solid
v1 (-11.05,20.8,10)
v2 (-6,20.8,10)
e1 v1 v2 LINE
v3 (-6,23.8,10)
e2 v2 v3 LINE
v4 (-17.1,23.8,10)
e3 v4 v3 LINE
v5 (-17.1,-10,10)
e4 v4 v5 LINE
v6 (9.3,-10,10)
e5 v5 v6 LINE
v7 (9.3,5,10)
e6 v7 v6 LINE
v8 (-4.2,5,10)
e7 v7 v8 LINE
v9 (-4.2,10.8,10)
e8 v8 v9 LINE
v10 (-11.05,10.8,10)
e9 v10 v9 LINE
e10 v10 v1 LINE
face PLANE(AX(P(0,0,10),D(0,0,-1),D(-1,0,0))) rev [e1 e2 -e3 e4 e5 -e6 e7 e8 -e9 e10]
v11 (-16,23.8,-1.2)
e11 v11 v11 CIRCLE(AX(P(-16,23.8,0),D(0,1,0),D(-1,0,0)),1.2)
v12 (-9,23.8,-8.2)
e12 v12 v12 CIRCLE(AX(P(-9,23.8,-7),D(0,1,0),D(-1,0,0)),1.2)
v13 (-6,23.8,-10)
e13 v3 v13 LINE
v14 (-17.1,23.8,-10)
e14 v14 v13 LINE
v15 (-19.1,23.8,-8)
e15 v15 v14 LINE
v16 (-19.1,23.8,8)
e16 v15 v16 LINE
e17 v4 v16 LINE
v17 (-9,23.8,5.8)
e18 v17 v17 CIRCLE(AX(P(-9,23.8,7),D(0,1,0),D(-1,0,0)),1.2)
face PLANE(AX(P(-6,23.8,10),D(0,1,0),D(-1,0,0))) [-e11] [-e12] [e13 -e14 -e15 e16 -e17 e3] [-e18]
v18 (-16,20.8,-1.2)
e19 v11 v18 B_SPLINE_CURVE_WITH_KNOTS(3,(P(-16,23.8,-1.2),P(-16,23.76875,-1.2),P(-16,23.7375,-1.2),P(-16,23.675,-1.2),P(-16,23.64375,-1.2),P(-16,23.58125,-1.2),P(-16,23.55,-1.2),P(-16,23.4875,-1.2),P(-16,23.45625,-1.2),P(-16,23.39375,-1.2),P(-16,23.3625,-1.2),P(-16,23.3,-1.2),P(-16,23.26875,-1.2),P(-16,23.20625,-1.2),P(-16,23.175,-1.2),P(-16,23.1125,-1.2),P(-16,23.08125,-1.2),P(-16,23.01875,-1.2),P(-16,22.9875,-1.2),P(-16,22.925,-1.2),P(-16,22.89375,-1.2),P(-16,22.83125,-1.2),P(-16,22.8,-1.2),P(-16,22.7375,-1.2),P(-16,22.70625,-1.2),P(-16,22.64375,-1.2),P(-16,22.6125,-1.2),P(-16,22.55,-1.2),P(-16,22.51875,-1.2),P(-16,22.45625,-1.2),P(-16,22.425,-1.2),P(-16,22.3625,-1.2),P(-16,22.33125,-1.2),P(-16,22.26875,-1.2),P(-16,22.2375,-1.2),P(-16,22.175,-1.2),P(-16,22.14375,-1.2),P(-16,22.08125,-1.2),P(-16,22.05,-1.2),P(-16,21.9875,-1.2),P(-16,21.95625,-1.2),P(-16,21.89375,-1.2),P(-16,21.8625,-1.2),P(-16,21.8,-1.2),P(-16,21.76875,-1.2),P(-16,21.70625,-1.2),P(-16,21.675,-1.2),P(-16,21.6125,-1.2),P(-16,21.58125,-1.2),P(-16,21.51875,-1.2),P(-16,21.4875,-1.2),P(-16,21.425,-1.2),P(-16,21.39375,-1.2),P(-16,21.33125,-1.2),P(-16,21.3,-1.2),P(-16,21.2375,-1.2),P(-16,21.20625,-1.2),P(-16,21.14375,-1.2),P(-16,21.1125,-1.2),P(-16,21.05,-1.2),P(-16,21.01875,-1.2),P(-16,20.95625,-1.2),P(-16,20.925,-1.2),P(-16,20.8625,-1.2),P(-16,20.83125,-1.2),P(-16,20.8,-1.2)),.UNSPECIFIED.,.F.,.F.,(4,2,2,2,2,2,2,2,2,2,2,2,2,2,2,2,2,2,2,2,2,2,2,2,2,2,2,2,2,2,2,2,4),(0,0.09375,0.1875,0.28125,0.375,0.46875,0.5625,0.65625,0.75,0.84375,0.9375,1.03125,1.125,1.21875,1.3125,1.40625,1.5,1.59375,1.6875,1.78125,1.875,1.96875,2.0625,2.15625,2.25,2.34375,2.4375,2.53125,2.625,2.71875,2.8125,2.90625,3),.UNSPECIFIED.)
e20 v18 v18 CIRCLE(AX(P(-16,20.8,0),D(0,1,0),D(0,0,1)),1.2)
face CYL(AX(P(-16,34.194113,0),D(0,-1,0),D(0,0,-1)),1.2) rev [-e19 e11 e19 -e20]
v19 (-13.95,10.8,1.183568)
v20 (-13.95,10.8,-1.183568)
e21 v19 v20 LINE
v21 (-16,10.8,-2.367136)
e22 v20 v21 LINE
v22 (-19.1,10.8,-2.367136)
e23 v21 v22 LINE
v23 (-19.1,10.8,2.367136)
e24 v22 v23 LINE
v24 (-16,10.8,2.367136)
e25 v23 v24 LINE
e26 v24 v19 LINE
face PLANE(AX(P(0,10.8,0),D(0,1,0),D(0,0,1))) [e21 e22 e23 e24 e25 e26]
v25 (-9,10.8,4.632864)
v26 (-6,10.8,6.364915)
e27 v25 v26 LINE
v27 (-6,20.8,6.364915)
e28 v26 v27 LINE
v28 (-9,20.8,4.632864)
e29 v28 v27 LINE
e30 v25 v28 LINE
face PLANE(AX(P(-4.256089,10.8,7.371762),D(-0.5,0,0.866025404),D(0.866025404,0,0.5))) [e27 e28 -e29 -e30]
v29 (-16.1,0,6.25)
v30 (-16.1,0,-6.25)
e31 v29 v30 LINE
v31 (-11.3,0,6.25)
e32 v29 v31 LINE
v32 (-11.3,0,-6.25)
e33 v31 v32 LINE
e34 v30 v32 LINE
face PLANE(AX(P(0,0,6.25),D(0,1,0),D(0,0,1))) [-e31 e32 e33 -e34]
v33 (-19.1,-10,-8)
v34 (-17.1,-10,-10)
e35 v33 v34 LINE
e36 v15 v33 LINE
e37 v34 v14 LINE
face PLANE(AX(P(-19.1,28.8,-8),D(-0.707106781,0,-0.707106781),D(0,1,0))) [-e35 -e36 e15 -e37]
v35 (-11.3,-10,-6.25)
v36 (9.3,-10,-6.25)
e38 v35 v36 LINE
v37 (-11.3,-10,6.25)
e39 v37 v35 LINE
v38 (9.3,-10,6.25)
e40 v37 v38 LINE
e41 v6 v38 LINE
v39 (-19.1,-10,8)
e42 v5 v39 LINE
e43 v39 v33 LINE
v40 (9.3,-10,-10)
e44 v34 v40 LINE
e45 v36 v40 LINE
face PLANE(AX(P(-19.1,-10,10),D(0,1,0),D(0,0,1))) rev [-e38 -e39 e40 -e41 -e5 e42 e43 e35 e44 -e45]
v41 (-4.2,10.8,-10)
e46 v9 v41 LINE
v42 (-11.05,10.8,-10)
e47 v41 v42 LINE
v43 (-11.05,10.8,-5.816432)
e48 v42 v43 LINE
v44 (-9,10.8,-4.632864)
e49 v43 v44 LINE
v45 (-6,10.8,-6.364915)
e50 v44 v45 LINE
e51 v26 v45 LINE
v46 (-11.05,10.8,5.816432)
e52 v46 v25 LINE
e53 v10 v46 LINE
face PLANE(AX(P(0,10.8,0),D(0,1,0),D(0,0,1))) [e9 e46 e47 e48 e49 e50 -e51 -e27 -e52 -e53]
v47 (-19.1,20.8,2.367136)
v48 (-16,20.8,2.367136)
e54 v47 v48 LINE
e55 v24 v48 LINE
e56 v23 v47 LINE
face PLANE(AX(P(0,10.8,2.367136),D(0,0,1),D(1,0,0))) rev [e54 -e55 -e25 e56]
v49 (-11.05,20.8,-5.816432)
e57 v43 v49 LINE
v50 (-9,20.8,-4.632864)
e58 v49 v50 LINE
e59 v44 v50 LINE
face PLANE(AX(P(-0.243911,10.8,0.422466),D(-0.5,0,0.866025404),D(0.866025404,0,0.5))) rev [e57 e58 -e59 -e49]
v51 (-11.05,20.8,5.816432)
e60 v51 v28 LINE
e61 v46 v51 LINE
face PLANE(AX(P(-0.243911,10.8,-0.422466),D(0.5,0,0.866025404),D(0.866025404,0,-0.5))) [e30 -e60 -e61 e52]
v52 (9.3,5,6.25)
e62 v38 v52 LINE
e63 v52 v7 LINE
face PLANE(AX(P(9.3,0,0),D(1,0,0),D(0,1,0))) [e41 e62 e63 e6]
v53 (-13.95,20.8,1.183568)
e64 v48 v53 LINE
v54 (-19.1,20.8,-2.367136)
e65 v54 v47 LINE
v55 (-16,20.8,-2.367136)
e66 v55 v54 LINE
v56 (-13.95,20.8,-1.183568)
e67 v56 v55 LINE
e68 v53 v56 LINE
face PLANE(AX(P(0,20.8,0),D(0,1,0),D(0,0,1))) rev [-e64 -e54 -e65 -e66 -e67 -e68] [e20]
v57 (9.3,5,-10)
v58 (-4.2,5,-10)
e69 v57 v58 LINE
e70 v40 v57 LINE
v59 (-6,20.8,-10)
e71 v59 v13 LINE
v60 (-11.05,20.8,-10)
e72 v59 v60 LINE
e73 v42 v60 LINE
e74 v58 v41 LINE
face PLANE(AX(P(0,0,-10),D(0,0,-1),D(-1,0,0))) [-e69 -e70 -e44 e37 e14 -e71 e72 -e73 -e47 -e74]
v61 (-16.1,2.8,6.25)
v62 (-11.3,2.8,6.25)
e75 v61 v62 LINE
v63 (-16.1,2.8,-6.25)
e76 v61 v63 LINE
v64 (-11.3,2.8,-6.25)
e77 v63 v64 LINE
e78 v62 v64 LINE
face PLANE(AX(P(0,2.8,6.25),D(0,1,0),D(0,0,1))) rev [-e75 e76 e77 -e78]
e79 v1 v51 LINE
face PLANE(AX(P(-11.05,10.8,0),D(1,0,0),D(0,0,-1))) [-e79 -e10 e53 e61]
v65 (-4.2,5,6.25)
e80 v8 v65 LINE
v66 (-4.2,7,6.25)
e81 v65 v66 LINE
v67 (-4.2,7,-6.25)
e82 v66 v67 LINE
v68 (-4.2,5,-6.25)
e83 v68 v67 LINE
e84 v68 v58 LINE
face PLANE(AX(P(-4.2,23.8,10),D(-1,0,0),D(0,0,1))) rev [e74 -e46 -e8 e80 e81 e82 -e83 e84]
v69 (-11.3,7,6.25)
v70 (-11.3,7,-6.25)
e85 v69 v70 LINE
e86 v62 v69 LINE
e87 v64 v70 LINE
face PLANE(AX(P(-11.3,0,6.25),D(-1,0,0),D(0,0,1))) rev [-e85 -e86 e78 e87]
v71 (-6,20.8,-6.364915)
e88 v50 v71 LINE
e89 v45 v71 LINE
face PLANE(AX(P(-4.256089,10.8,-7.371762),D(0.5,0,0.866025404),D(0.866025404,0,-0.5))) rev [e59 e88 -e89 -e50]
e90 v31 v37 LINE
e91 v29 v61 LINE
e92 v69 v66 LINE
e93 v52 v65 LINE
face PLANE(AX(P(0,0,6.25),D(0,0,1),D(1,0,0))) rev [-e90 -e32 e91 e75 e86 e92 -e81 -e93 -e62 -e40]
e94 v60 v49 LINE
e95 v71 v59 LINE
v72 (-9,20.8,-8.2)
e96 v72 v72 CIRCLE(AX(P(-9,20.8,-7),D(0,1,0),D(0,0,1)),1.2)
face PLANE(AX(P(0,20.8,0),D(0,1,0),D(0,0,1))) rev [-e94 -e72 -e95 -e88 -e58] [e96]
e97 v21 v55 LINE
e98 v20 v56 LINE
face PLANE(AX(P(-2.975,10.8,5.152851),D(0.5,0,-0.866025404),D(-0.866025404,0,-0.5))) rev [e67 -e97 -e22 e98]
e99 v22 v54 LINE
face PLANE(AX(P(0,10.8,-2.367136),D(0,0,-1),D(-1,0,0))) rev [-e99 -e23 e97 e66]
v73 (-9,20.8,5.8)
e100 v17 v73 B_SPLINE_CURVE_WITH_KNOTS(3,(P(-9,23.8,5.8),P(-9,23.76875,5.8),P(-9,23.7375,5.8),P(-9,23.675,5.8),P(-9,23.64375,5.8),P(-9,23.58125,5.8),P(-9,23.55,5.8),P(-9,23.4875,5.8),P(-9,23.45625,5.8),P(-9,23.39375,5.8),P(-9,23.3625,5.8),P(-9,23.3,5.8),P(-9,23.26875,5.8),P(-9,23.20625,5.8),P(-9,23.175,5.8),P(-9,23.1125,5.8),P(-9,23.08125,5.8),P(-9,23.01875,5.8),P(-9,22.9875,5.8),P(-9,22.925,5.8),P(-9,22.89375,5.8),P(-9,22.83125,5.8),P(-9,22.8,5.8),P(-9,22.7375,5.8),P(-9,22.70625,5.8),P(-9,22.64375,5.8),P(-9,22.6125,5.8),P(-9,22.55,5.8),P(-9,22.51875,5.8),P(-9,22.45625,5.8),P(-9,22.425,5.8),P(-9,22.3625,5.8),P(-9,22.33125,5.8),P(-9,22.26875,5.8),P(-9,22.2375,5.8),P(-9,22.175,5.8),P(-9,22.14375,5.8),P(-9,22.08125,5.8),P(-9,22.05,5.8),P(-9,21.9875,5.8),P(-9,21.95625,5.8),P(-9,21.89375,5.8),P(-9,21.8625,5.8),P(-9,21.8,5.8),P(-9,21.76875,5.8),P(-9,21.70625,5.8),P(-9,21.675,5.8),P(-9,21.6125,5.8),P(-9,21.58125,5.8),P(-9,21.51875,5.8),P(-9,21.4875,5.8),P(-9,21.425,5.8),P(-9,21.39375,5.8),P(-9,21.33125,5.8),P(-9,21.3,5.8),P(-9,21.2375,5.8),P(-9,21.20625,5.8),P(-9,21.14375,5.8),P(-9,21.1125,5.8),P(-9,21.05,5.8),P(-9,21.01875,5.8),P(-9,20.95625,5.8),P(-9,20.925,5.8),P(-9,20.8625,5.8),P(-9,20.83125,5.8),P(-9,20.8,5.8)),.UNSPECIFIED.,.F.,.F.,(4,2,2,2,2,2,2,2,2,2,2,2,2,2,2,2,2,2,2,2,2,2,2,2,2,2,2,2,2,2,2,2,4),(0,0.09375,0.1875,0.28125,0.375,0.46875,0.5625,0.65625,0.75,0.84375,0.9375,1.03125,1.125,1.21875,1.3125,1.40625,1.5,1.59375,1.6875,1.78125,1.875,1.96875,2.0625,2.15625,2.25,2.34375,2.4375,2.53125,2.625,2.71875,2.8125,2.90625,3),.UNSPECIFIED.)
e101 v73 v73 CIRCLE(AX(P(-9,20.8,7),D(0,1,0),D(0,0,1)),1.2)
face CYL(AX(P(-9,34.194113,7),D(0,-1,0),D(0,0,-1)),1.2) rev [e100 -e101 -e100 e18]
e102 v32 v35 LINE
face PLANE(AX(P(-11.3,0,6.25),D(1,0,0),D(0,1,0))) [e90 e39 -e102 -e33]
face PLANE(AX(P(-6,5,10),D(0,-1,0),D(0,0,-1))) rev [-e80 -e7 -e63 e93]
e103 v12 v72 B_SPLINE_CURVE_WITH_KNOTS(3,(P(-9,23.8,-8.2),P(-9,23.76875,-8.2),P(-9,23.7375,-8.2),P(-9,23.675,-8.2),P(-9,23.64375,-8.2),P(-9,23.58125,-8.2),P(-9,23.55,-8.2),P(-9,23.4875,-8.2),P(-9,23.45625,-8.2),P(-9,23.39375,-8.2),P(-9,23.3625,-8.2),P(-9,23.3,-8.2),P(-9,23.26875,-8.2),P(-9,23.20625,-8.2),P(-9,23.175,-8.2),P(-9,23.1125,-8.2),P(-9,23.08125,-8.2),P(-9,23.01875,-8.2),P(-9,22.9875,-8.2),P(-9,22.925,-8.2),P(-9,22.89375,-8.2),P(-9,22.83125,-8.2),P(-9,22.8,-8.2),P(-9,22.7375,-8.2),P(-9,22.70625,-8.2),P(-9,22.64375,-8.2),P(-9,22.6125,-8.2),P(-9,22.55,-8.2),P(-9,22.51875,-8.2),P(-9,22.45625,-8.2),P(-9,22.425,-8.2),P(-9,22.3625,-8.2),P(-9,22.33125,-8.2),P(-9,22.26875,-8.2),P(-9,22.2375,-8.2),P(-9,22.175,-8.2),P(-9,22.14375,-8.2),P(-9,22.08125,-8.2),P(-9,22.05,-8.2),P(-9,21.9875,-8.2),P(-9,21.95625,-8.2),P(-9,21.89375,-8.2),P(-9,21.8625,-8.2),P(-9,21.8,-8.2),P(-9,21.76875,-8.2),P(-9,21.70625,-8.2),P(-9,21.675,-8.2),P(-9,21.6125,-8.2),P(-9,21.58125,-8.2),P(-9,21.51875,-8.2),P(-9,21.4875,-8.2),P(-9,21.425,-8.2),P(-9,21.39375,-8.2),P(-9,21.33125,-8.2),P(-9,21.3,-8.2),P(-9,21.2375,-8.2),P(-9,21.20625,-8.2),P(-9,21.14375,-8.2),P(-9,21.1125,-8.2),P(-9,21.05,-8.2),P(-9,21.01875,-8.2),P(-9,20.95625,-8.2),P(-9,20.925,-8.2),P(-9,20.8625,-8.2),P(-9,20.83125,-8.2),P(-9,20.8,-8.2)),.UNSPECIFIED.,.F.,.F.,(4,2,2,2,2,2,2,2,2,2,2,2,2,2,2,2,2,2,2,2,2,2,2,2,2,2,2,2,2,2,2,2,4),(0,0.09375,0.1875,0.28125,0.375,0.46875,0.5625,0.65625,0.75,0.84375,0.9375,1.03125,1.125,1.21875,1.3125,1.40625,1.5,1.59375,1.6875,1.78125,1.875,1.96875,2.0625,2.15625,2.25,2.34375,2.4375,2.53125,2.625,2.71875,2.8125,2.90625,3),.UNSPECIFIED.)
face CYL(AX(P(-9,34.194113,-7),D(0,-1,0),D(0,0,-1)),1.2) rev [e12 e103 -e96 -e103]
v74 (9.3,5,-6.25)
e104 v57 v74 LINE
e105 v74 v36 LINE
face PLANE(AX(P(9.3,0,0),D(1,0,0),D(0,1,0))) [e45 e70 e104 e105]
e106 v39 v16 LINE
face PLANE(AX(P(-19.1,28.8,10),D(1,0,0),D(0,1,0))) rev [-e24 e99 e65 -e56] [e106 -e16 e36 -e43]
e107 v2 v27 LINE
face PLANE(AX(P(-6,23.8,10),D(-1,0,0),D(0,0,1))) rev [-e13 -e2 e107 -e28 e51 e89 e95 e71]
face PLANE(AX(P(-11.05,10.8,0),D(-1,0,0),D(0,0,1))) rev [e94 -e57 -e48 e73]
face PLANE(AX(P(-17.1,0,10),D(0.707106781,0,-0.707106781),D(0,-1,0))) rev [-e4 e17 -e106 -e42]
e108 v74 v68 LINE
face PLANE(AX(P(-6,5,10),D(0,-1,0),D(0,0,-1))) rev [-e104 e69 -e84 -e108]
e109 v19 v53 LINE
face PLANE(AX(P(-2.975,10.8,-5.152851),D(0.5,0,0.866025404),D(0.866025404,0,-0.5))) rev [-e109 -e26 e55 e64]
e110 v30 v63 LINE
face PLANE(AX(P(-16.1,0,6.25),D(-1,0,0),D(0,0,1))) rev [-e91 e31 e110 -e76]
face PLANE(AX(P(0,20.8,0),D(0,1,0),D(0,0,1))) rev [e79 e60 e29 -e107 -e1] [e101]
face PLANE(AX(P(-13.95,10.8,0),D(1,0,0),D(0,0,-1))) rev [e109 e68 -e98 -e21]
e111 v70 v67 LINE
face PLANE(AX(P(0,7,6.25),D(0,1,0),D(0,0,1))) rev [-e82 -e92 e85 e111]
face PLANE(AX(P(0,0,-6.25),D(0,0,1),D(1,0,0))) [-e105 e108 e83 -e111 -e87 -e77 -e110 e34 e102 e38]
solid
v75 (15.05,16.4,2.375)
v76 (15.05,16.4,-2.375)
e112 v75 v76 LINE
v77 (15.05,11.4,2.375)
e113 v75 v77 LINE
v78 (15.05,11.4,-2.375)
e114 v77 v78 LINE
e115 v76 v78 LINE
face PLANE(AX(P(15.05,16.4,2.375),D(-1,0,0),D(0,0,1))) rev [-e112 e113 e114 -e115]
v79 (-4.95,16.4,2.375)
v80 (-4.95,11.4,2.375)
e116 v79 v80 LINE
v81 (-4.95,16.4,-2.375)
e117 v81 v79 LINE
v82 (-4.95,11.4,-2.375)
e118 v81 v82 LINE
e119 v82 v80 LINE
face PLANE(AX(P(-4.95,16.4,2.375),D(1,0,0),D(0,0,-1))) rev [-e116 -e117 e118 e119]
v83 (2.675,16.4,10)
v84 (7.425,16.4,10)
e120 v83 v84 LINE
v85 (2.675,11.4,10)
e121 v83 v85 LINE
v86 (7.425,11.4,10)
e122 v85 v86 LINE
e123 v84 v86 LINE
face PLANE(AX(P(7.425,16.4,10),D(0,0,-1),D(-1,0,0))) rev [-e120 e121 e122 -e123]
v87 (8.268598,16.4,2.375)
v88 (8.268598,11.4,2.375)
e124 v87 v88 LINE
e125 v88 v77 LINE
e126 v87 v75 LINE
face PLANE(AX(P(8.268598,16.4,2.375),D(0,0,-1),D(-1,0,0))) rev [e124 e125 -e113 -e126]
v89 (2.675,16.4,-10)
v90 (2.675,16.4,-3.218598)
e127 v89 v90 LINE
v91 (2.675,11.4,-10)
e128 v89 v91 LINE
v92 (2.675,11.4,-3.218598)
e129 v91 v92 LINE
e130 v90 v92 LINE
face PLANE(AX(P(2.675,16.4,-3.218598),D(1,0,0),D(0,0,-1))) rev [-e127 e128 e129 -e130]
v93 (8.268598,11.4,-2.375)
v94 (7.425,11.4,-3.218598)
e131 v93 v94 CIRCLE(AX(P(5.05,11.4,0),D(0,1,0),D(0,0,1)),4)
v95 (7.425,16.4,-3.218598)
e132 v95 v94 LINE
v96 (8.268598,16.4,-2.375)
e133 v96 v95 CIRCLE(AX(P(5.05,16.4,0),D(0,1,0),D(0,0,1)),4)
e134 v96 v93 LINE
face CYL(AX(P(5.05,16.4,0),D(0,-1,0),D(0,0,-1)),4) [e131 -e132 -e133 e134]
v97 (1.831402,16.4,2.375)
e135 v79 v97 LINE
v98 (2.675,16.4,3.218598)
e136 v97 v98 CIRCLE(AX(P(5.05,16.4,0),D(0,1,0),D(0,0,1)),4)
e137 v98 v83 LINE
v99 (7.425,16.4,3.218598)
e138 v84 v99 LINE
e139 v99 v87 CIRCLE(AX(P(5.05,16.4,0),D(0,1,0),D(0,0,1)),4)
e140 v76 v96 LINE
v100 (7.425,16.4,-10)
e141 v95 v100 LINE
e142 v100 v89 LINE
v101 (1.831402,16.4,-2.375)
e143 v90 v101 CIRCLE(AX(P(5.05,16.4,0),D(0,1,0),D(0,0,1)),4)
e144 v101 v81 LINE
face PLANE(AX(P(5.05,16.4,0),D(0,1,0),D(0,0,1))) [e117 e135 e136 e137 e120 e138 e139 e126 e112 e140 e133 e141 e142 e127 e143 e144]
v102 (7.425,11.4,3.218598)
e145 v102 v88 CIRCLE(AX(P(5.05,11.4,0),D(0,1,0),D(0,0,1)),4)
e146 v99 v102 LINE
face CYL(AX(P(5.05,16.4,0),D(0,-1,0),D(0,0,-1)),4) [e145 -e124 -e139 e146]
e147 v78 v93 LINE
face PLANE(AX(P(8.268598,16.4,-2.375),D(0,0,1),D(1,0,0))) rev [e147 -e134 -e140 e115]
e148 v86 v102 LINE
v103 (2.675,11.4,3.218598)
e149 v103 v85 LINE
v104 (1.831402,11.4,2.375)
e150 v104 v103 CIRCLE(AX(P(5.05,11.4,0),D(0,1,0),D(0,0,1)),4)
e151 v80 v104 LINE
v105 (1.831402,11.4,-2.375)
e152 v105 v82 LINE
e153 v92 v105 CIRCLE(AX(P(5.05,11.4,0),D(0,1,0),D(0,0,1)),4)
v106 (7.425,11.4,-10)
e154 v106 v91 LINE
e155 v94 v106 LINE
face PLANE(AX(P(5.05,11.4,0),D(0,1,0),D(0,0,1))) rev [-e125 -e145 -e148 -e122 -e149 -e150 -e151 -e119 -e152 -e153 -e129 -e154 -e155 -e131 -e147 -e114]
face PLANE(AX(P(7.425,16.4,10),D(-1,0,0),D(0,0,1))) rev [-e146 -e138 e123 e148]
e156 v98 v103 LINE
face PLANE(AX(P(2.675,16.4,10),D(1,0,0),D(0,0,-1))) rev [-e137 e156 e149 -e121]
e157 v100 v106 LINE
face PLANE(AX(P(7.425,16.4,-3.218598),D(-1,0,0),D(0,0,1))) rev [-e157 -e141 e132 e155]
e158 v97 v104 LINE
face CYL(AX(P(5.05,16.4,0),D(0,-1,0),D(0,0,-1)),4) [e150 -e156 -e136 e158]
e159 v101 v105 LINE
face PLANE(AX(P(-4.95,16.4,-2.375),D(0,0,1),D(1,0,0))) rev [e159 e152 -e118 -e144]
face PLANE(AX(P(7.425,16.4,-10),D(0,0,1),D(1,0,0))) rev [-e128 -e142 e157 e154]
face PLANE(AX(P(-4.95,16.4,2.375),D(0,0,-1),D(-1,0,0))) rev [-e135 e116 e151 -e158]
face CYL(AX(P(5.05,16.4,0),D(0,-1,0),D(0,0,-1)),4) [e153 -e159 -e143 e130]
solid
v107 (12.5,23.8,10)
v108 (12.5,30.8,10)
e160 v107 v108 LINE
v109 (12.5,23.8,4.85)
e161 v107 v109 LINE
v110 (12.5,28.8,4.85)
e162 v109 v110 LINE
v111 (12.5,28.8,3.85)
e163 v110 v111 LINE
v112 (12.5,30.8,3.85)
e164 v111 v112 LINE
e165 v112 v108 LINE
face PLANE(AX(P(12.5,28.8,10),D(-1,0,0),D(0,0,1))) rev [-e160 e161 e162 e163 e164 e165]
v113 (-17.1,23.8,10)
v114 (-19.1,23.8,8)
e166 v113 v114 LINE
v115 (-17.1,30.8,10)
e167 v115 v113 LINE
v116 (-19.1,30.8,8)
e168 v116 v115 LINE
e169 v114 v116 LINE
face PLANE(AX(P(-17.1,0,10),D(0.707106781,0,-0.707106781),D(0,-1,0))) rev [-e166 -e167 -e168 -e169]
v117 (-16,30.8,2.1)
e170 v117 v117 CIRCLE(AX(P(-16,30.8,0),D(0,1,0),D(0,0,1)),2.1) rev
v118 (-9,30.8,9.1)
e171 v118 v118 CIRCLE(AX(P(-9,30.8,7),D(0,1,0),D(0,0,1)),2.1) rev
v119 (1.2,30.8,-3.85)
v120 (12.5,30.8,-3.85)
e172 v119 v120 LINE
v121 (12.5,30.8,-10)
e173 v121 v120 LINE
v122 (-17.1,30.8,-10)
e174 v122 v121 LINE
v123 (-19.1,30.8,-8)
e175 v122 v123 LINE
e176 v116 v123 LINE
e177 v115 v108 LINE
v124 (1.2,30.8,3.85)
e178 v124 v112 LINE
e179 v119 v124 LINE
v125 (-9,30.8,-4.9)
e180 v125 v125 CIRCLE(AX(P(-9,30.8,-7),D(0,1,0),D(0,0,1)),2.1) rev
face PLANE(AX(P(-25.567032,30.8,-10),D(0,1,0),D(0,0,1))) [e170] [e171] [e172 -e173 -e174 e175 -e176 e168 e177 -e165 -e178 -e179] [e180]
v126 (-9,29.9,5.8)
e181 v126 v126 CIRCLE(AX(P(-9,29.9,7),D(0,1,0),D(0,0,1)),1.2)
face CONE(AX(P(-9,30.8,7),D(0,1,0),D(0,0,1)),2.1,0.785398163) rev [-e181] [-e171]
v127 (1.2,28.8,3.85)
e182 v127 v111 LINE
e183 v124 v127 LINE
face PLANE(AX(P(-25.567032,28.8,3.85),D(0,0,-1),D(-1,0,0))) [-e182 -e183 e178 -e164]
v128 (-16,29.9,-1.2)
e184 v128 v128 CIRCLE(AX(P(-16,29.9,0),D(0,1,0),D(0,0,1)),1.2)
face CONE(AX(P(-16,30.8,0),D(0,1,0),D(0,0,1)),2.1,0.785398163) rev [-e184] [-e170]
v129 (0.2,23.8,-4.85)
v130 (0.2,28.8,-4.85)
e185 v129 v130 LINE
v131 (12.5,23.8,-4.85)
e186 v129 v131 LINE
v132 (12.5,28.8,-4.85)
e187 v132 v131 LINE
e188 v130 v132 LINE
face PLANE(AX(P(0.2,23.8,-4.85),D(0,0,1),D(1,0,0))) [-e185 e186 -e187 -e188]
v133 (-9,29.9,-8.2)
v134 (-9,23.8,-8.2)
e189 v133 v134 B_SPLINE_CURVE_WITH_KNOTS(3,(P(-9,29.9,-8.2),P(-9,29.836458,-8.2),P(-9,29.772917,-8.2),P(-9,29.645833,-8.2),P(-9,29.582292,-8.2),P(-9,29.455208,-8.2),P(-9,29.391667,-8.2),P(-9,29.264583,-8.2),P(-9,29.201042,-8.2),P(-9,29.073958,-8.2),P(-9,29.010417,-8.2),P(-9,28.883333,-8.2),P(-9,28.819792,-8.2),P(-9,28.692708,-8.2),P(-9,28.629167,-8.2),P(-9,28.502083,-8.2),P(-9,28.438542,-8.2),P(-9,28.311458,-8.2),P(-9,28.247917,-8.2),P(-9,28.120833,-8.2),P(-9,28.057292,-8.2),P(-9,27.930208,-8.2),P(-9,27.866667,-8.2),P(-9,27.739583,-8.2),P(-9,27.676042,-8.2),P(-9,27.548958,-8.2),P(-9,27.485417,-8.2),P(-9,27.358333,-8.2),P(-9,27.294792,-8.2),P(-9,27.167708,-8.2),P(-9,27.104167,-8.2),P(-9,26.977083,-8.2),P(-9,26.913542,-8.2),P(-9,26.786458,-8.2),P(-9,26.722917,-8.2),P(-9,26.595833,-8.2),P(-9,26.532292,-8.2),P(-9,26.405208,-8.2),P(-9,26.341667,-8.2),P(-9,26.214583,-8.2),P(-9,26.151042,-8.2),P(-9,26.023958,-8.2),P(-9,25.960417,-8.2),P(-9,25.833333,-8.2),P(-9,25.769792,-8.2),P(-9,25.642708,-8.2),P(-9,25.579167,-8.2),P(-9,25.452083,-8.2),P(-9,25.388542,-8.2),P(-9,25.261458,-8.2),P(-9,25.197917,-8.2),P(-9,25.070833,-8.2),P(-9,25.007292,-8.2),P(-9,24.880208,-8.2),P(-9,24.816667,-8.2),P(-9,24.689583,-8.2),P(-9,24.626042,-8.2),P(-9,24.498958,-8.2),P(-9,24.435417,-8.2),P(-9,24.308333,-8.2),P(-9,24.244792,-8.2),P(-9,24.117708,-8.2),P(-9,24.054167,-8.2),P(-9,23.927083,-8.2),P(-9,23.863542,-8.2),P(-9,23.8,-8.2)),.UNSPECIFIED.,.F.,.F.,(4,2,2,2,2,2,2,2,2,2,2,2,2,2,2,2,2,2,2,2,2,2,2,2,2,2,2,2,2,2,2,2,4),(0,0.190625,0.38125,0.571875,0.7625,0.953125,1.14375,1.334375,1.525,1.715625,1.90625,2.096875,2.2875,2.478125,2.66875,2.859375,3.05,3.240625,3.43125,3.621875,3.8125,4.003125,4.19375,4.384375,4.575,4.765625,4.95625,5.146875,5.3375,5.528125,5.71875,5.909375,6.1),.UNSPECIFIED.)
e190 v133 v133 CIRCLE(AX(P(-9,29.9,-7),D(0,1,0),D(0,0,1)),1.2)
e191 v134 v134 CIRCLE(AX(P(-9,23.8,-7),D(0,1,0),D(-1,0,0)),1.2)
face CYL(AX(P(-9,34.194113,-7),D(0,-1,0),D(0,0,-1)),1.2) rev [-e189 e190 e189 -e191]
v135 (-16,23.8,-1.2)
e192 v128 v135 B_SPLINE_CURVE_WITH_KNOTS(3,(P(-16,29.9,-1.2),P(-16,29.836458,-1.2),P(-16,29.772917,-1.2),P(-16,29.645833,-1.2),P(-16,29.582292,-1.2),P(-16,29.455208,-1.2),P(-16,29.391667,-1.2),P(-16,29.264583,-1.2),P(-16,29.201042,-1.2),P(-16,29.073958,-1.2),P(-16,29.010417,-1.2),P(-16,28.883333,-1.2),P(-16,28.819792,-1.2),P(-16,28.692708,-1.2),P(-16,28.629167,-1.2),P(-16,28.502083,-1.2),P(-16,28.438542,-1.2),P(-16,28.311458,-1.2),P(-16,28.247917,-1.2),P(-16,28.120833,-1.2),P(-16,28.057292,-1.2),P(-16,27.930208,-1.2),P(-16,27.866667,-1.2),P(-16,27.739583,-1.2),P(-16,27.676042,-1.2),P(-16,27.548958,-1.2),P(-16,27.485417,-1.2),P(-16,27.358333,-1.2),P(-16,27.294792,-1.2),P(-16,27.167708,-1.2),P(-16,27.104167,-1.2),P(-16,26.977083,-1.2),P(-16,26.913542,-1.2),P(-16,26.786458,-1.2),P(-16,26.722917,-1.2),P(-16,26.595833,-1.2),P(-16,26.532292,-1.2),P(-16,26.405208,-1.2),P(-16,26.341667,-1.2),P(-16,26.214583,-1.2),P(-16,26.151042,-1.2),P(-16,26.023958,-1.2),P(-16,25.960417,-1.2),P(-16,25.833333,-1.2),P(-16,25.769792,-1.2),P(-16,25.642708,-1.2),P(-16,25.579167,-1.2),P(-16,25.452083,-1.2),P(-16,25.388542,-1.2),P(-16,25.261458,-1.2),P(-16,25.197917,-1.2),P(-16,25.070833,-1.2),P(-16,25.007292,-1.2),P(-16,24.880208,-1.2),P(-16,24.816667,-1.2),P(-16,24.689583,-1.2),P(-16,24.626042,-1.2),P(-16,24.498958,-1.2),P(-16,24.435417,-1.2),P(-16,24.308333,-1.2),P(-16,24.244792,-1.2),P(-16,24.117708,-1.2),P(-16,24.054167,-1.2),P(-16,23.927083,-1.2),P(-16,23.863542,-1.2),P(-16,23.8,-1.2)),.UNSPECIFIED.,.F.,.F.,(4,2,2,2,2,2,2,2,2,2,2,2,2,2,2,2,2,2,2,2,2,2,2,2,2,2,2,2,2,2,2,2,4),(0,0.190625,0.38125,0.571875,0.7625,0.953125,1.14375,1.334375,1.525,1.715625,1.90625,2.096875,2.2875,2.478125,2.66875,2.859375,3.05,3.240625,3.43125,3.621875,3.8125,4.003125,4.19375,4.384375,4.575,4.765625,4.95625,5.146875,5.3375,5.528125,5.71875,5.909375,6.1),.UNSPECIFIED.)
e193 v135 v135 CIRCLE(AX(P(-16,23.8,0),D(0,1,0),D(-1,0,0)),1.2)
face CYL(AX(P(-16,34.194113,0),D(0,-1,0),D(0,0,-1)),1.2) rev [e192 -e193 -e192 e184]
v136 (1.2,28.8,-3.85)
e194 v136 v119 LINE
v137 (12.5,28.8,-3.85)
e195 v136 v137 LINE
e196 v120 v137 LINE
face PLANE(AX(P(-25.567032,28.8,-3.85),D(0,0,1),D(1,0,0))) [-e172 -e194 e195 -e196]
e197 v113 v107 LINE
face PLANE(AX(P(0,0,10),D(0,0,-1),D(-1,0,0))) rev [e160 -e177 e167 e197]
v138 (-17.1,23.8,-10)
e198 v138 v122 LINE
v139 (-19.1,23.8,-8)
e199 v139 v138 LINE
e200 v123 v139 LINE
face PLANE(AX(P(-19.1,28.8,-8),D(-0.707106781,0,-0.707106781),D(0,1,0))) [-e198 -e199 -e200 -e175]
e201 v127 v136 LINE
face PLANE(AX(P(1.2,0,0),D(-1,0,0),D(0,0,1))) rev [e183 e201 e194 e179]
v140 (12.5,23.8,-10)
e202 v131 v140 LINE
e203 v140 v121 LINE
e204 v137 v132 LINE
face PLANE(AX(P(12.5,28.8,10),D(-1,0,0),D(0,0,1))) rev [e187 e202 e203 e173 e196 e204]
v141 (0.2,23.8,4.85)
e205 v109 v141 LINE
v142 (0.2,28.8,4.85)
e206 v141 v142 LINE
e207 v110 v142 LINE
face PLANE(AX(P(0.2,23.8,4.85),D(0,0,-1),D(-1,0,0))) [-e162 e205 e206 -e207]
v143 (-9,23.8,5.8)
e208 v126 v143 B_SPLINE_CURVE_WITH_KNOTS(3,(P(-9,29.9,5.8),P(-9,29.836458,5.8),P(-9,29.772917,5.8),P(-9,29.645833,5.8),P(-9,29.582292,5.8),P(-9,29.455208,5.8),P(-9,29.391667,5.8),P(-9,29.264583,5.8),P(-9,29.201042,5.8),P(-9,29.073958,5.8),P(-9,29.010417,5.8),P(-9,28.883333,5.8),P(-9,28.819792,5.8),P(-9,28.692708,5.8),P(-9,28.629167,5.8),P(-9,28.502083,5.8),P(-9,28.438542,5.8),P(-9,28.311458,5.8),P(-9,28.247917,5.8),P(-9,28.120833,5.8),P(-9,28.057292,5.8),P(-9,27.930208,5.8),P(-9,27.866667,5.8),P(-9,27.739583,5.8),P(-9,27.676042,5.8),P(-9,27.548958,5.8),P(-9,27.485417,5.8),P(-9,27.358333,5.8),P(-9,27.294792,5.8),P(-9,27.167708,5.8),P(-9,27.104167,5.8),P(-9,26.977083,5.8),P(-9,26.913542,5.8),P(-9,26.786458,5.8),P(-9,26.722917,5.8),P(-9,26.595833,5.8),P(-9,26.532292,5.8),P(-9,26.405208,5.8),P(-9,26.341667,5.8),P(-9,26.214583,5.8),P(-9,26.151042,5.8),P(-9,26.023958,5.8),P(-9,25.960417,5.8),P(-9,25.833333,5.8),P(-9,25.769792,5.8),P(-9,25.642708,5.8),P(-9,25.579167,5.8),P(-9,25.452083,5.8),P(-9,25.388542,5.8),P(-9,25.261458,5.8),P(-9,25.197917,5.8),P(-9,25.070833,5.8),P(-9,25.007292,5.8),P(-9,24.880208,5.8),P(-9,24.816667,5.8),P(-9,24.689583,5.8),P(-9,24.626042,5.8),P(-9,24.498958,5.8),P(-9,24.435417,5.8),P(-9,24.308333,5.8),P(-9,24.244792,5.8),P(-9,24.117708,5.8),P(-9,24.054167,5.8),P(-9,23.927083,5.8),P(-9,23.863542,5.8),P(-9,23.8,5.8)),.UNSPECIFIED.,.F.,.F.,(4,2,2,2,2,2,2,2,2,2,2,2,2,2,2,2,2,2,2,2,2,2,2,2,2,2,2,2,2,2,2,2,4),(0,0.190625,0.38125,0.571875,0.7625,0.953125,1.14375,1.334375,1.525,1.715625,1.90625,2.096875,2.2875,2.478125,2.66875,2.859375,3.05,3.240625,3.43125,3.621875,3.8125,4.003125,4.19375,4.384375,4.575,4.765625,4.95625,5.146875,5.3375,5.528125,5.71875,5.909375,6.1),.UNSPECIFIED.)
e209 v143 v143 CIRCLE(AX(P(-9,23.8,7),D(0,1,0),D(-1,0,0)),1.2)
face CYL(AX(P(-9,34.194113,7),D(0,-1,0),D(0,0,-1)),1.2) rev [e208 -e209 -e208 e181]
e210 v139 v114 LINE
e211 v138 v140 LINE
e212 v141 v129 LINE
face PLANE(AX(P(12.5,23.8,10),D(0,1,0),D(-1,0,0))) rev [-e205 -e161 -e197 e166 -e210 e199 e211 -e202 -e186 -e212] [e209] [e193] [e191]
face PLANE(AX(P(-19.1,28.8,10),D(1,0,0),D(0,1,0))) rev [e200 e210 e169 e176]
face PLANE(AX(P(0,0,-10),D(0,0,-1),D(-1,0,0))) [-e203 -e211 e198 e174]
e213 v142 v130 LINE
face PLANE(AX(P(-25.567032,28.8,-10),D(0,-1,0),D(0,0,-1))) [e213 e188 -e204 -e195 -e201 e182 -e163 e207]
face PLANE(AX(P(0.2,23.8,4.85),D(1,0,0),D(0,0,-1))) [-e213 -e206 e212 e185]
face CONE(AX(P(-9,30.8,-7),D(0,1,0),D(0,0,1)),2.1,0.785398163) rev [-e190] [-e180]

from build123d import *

# Parameters (mm, degrees)
SKETCH1_W                = 22.6
SKETCH1_H                = 15.7
SKETCH1_H_2              = 4.2
BOSS_EXTRUDE1_DEPTH      = 6.25
BOSS_EXTRUDE2_DEPTH      = 4.4
SKETCH4_W                = 9.7
SKETCH4_H                = 9.7
BOSS_EXTRUDE3_DEPTH      = 5
BOSS_EXTRUDE9_DEPTH      = 5
SKETCH8_R                = 3.3
BOSS_EXTRUDE5_DEPTH      = 5.4
BOSS_EXTRUDE5_DRAFT      = 13
BOSS_EXTRUDE6_DEPTH      = 10
SKETCH9_W                = 9.7
SKETCH9_H                = 5
CUT_EXTRUDE1_DEPTH       = 12.3
BOSS_EXTRUDE7_REACH      = 45.909
SKETCH10_W               = 6.15
SKETCH10_H               = 2
BOSS_EXTRUDE8_START      = -19.3
SKETCH11_W               = 7.7
SKETCH11_H               = 2
BOSS_EXTRUDE8_DEPTH      = 20.3
CHAMFER1_SIZE            = 2
SURFACE_EXTRUDE1_1_BACK  = 25
SURFACE_EXTRUDE1_1_DEPTH = 35
SURFACE_EXTRUDE1_2_BACK  = 25
SURFACE_EXTRUDE1_2_DEPTH = 35
CUT_EXTRUDE2_START       = -3
CUT_EXTRUDE2_DEPTH       = 10
CUT_EXTRUDE3_START       = -12.4
SKETCH15_R               = 1.2
CUT_EXTRUDE3_DEPTH       = 10
CHAMFER2_SIZE            = 0.9
SKETCH16_W               = 3.75
SKETCH16_H               = 15
CUT_EXTRUDE4_DEPTH       = 2
MOVE_START               = -6
MOVE_FACE1_DEPTH         = 1.8


# Read off the part's stored shape, not the designer's step: Move Face1
with BuildPart() as part:
    # Sketch1 → Boss-Extrude1 (new, symmetric)
    with BuildSketch(Plane.XY):
        with Locations((0, -7.85)):
            Rectangle(SKETCH1_W, SKETCH1_H)
        Polygon((-16.1, 0), (-11.3, 0), (11.3, 0), (16.1, 0), (16.1, 2.8), (11.3, 2.8), (-11.3, 2.8), (-16.1, 2.8), align=None)
        with Locations((0, 4.9)):
            Rectangle(SKETCH1_W, SKETCH1_H_2)
    extrude(amount=BOSS_EXTRUDE1_DEPTH, both=True)

    # Sketch2 → Boss-Extrude2 (add)
    with BuildSketch(Plane(origin=(0, 7, 0), x_dir=(1, 0, 0), z_dir=(0, 1, 0))):
        with BuildLine():
            ThreePointArc((-0.486469995, -2.9), (11.3, 0), (-0.486469995, 2.9))
            ThreePointArc((-0.486469995, 2.9), (-3.386469995, 0), (-0.486469995, -2.9))
        make_face()
    extrude(amount=BOSS_EXTRUDE2_DEPTH)


with BuildPart() as body_2:
    # Sketch4 → Boss-Extrude3 (new body)
    with BuildSketch(Plane(origin=(0, 28.8, 0), x_dir=(-1, 0, 0), z_dir=(0, -1, 0))):
        with Locations((-5.05, 0)):
            Rectangle(SKETCH4_W, SKETCH4_H)
    extrude(amount=BOSS_EXTRUDE3_DEPTH)


with BuildPart() as body_3:
    # Sketch12 → Boss-Extrude9 (new body)
    with BuildSketch(Plane(origin=(0, 11.4, 0), x_dir=(1, 0, 0), z_dir=(0, 1, 0))):
        with BuildLine():
            Line((-4.95, -2.375), (1.831401703, -2.375))
            ThreePointArc((1.831401703, -2.375), (2.221572875, -2.828427125), (2.675, -3.218598297))
            Line((2.675, -3.218598297), (2.675, -10))
            Line((2.675, -10), (7.425, -10))
            Line((7.425, -10), (7.425, -3.218598297))
            ThreePointArc((7.425, -3.218598297), (7.878427125, -2.828427125), (8.268598297, -2.375))
            Line((8.268598297, -2.375), (15.05, -2.375))
            Line((15.05, -2.375), (15.05, 2.375))
            Line((15.05, 2.375), (8.268598297, 2.375))
            ThreePointArc((8.268598297, 2.375), (7.878427125, 2.828427125), (7.425, 3.218598297))
            Line((7.425, 3.218598297), (7.425, 10))
            Line((7.425, 10), (2.675, 10))
            Line((2.675, 10), (2.675, 3.218598297))
            ThreePointArc((2.675, 3.218598297), (2.221572875, 2.828427125), (1.831401703, 2.375))
            Line((1.831401703, 2.375), (-4.95, 2.375))
            Line((-4.95, 2.375), (-4.95, -2.375))
        make_face()
    extrude(amount=BOSS_EXTRUDE9_DEPTH)


with BuildPart() as boss_extrude5_tool:
    # Sketch8 → Boss-Extrude5 (with draft: the straight prism first)
    with BuildSketch(Plane(origin=(0, 18.4, 0), x_dir=(-1, 0, 0), z_dir=(0, -1, 0))):
        with Locations((-5.05, 0)):
            Circle(SKETCH8_R)
    extrude(amount=-BOSS_EXTRUDE5_DEPTH)
    # Boss-Extrude5: the draft: its side faces are tilted about the plane it starts from
    boss_extrude5_sides = [boss_extrude5_tool.faces().sort_by_distance(p)[0] for p in [
        (8.35, 21.1, 0),
    ]]
    draft(boss_extrude5_sides, Plane(origin=(0, 18.4, 0), x_dir=(-1, 0, 0), z_dir=(0, -1, 0)), BOSS_EXTRUDE5_DRAFT)


with BuildPart() as body_2_1:
    add(body_2.part)

    # Boss-Extrude5: add boss_extrude5_tool
    add(boss_extrude5_tool.part)


with BuildPart() as body_4:
    # Sketch3 → Boss-Extrude6 (new, symmetric)
    with BuildSketch(Plane.XY):
        Polygon((12.5, 28.8), (-19.1, 28.8), (-19.1, -10), (11.3, -10), (11.3, 5), (-6, 5), (-6, 23.8), (12.5, 23.8), align=None)
    extrude(amount=BOSS_EXTRUDE6_DEPTH, both=True)

    # Combine1: cut part, body 2
    add(part.part, mode=Mode.SUBTRACT)
    add(body_2_1.part, mode=Mode.SUBTRACT)

    # Sketch9 → Cut-Extrude1 (cut)
    with BuildSketch(Plane(origin=(0.2, 0, 0), x_dir=(0, 0, -1), z_dir=(1, 0, 0))):
        with Locations((0, 26.3)):
            Rectangle(SKETCH9_W, SKETCH9_H)
    extrude(amount=CUT_EXTRUDE1_DEPTH, mode=Mode.SUBTRACT)

    # Boss-Extrude7: up to this face of the body (flat: up to its plane)
    boss_extrude7_end = Plane(body_4.part.faces().sort_by_distance((-19.1, 9.4, 0))[0])
    # Sketch10 → Boss-Extrude7 (add, up to the picked face)
    with BuildSketch(Plane(origin=(12.5, 0, 0), x_dir=(0, 0, -1), z_dir=(1, 0, 0)), mode=Mode.PRIVATE) as boss_extrude7_sk1:
        with Locations((6.925, 29.8)):
            Rectangle(SKETCH10_W, SKETCH10_H)
    boss_extrude7_tool1 = split(extrude(boss_extrude7_sk1.sketch, amount=-BOSS_EXTRUDE7_REACH, mode=Mode.PRIVATE), bisect_by=boss_extrude7_end, keep=Keep.BOTH, mode=Mode.PRIVATE)
    # Sketch10 → Boss-Extrude7 (add, up to the picked face)
    with BuildSketch(Plane(origin=(12.5, 0, 0), x_dir=(0, 0, -1), z_dir=(1, 0, 0)), mode=Mode.PRIVATE) as boss_extrude7_sk2:
        with Locations((-6.925, 29.8)):
            Rectangle(SKETCH10_W, SKETCH10_H)
    boss_extrude7_tool2 = split(extrude(boss_extrude7_sk2.sketch, amount=-BOSS_EXTRUDE7_REACH, mode=Mode.PRIVATE), bisect_by=boss_extrude7_end, keep=Keep.BOTH, mode=Mode.PRIVATE)
    add(boss_extrude7_tool1.solids().sort_by(Axis((12.5, 29.8, -6.925), (-1, 0, 0)))[0])
    add(boss_extrude7_tool2.solids().sort_by(Axis((12.5, 29.8, 6.925), (-1, 0, 0)))[0])

    # Sketch11 → Boss-Extrude8 (add)
    with BuildSketch(Plane(origin=(0.2, 0, 0), x_dir=(0, 0, -1), z_dir=(1, 0, 0)).offset(BOSS_EXTRUDE8_START)):
        with Locations((0, 29.8)):
            Rectangle(SKETCH11_W, SKETCH11_H)
    extrude(amount=BOSS_EXTRUDE8_DEPTH)

    # Chamfer1
    chamfer1_edges = [body_4.edges().sort_by_distance(p)[0] for p in [
        (-19.1, 10.4, -10),
        (-19.1, 10.4, 10),
    ]]
    chamfer(chamfer1_edges, length=CHAMFER1_SIZE)


with BuildPart() as body_3_2:
    # Split1: the piece behind the surface
    add(body_4.part)
    # Surface-Extrude1: a surface, the sketch's curves swept straight by 35 mm
    with BuildLine(Plane.XY.offset(10).offset(-SURFACE_EXTRUDE1_1_BACK), mode=Mode.PRIVATE) as surface_extrude1_1_path:
        Line((-6, 23.8), (-38.363313576, 23.8))
    surface_extrude1_1 = Shell.extrude(surface_extrude1_1_path.wire(), (0 * SURFACE_EXTRUDE1_1_DEPTH, 0 * SURFACE_EXTRUDE1_1_DEPTH, 1 * SURFACE_EXTRUDE1_1_DEPTH))
    split(bisect_by=surface_extrude1_1, keep=Keep.BOTTOM)


with BuildPart() as body_4_1:
    add(body_4.part)

    # Split1: split by a surface, the side it looks to stays
    # Surface-Extrude1: a surface, the sketch's curves swept straight by 35 mm
    with BuildLine(Plane.XY.offset(10).offset(-SURFACE_EXTRUDE1_2_BACK), mode=Mode.PRIVATE) as surface_extrude1_2_path:
        Line((-6, 23.8), (-38.363313576, 23.8))
    surface_extrude1_2 = Shell.extrude(surface_extrude1_2_path.wire(), (0 * SURFACE_EXTRUDE1_2_DEPTH, 0 * SURFACE_EXTRUDE1_2_DEPTH, 1 * SURFACE_EXTRUDE1_2_DEPTH))
    split(bisect_by=surface_extrude1_2, keep=Keep.TOP)

    # Sketch14 → Cut-Extrude2 (cut)
    with BuildSketch(Plane(origin=(0, 23.8, 0), x_dir=(1, 0, 0), z_dir=(0, 1, 0)).offset(CUT_EXTRUDE2_START)):
        Polygon((-18.05, 1.183568052), (-16, 2.367136104), (-19.1, 2.367136104), (-19.1, -2.367136104), (-16, -2.367136104), (-18.05, -1.183568052), align=None)
        Polygon((-16, -2.367136104), (-13.95, -1.183568052), (-13.95, 1.183568052), (-16, 2.367136104), (-18.05, 1.183568052), (-18.05, -1.183568052), align=None)
        Polygon((-6.95, 8.183568052), (-9, 9.367136104), (-11.05, 8.183568052), (-11.05, 5.816431948), (-9, 4.632863896), (-6.95, 5.816431948), align=None)
        Polygon((-11.05, 10), (-11.05, 8.183568052), (-9, 9.367136104), (-6.95, 8.183568052), (-6.95, 5.816431948), (-6, 6.364914704), (-6, 10), align=None)
        Polygon((-11.05, -8.183568052), (-11.05, -5.816431948), (-9, -4.632863896), (-6.95, -5.816431948), (-6.95, -8.183568052), (-9, -9.367136104), align=None)
        Polygon((-6, -10), (-6, -6.364914704), (-6.95, -5.816431948), (-6.95, -8.183568052), (-9, -9.367136104), (-11.05, -8.183568052), (-11.05, -10), align=None)
    extrude(amount=-CUT_EXTRUDE2_DEPTH, mode=Mode.SUBTRACT)


with BuildPart() as cut_extrude3_tool:
    # Sketch15 → Cut-Extrude3 (new body)
    with BuildSketch(Plane(origin=(0, 18.4, 0), x_dir=(-1, 0, 0), z_dir=(0, -1, 0)).offset(CUT_EXTRUDE3_START)):
        with Locations(Location((9, 7, 0), (0, 0, 90))):
            Circle(SKETCH15_R)
        with Locations(Location((9, -7, 0), (0, 0, 90))):
            Circle(SKETCH15_R)
        with Locations(Location((16, 0, 0), (0, 0, 90))):
            Circle(SKETCH15_R)
    extrude(amount=CUT_EXTRUDE3_DEPTH)


with BuildPart() as body_4_2:
    add(body_4_1.part)

    # Cut-Extrude3: cut by cut_extrude3_tool
    add(cut_extrude3_tool.part, mode=Mode.SUBTRACT)

    # Sketch16 → Cut-Extrude4 (cut)
    with BuildSketch(Plane(origin=(11.3, 0, 0), x_dir=(0, 0, -1), z_dir=(1, 0, 0))):
        with Locations((8.125, -2.5)):
            Rectangle(SKETCH16_W, SKETCH16_H)
        with Locations((-8.125, -2.5)):
            Rectangle(SKETCH16_W, SKETCH16_H)
    extrude(amount=-CUT_EXTRUDE4_DEPTH, mode=Mode.SUBTRACT)

    # Move Face1 outline → Move Face1 (add)
    with BuildSketch(Plane.YZ.offset(MOVE_START)):
        Polygon((7, 6.25), (7, -6.25), (5, -6.25), (5, -10), (10.8, -10), (10.8, 10), (5, 10), (5, 6.25), align=None)
    extrude(amount=MOVE_FACE1_DEPTH)


with BuildPart() as body_3_2_1:
    add(body_3_2.part)

    # Cut-Extrude3: cut by cut_extrude3_tool
    add(cut_extrude3_tool.part, mode=Mode.SUBTRACT)

    # Chamfer2
    chamfer2_edges = [body_3_2_1.edges().sort_by_distance(p)[0] for p in [
        (-9, 30.8, -5.8),
        (-9, 30.8, 8.2),
        (-16, 30.8, 1.2),
    ]]
    chamfer(chamfer2_edges, length=CHAMFER2_SIZE)


solid = Compound([body_3.part, body_4_2.part, body_3_2_1.part])
